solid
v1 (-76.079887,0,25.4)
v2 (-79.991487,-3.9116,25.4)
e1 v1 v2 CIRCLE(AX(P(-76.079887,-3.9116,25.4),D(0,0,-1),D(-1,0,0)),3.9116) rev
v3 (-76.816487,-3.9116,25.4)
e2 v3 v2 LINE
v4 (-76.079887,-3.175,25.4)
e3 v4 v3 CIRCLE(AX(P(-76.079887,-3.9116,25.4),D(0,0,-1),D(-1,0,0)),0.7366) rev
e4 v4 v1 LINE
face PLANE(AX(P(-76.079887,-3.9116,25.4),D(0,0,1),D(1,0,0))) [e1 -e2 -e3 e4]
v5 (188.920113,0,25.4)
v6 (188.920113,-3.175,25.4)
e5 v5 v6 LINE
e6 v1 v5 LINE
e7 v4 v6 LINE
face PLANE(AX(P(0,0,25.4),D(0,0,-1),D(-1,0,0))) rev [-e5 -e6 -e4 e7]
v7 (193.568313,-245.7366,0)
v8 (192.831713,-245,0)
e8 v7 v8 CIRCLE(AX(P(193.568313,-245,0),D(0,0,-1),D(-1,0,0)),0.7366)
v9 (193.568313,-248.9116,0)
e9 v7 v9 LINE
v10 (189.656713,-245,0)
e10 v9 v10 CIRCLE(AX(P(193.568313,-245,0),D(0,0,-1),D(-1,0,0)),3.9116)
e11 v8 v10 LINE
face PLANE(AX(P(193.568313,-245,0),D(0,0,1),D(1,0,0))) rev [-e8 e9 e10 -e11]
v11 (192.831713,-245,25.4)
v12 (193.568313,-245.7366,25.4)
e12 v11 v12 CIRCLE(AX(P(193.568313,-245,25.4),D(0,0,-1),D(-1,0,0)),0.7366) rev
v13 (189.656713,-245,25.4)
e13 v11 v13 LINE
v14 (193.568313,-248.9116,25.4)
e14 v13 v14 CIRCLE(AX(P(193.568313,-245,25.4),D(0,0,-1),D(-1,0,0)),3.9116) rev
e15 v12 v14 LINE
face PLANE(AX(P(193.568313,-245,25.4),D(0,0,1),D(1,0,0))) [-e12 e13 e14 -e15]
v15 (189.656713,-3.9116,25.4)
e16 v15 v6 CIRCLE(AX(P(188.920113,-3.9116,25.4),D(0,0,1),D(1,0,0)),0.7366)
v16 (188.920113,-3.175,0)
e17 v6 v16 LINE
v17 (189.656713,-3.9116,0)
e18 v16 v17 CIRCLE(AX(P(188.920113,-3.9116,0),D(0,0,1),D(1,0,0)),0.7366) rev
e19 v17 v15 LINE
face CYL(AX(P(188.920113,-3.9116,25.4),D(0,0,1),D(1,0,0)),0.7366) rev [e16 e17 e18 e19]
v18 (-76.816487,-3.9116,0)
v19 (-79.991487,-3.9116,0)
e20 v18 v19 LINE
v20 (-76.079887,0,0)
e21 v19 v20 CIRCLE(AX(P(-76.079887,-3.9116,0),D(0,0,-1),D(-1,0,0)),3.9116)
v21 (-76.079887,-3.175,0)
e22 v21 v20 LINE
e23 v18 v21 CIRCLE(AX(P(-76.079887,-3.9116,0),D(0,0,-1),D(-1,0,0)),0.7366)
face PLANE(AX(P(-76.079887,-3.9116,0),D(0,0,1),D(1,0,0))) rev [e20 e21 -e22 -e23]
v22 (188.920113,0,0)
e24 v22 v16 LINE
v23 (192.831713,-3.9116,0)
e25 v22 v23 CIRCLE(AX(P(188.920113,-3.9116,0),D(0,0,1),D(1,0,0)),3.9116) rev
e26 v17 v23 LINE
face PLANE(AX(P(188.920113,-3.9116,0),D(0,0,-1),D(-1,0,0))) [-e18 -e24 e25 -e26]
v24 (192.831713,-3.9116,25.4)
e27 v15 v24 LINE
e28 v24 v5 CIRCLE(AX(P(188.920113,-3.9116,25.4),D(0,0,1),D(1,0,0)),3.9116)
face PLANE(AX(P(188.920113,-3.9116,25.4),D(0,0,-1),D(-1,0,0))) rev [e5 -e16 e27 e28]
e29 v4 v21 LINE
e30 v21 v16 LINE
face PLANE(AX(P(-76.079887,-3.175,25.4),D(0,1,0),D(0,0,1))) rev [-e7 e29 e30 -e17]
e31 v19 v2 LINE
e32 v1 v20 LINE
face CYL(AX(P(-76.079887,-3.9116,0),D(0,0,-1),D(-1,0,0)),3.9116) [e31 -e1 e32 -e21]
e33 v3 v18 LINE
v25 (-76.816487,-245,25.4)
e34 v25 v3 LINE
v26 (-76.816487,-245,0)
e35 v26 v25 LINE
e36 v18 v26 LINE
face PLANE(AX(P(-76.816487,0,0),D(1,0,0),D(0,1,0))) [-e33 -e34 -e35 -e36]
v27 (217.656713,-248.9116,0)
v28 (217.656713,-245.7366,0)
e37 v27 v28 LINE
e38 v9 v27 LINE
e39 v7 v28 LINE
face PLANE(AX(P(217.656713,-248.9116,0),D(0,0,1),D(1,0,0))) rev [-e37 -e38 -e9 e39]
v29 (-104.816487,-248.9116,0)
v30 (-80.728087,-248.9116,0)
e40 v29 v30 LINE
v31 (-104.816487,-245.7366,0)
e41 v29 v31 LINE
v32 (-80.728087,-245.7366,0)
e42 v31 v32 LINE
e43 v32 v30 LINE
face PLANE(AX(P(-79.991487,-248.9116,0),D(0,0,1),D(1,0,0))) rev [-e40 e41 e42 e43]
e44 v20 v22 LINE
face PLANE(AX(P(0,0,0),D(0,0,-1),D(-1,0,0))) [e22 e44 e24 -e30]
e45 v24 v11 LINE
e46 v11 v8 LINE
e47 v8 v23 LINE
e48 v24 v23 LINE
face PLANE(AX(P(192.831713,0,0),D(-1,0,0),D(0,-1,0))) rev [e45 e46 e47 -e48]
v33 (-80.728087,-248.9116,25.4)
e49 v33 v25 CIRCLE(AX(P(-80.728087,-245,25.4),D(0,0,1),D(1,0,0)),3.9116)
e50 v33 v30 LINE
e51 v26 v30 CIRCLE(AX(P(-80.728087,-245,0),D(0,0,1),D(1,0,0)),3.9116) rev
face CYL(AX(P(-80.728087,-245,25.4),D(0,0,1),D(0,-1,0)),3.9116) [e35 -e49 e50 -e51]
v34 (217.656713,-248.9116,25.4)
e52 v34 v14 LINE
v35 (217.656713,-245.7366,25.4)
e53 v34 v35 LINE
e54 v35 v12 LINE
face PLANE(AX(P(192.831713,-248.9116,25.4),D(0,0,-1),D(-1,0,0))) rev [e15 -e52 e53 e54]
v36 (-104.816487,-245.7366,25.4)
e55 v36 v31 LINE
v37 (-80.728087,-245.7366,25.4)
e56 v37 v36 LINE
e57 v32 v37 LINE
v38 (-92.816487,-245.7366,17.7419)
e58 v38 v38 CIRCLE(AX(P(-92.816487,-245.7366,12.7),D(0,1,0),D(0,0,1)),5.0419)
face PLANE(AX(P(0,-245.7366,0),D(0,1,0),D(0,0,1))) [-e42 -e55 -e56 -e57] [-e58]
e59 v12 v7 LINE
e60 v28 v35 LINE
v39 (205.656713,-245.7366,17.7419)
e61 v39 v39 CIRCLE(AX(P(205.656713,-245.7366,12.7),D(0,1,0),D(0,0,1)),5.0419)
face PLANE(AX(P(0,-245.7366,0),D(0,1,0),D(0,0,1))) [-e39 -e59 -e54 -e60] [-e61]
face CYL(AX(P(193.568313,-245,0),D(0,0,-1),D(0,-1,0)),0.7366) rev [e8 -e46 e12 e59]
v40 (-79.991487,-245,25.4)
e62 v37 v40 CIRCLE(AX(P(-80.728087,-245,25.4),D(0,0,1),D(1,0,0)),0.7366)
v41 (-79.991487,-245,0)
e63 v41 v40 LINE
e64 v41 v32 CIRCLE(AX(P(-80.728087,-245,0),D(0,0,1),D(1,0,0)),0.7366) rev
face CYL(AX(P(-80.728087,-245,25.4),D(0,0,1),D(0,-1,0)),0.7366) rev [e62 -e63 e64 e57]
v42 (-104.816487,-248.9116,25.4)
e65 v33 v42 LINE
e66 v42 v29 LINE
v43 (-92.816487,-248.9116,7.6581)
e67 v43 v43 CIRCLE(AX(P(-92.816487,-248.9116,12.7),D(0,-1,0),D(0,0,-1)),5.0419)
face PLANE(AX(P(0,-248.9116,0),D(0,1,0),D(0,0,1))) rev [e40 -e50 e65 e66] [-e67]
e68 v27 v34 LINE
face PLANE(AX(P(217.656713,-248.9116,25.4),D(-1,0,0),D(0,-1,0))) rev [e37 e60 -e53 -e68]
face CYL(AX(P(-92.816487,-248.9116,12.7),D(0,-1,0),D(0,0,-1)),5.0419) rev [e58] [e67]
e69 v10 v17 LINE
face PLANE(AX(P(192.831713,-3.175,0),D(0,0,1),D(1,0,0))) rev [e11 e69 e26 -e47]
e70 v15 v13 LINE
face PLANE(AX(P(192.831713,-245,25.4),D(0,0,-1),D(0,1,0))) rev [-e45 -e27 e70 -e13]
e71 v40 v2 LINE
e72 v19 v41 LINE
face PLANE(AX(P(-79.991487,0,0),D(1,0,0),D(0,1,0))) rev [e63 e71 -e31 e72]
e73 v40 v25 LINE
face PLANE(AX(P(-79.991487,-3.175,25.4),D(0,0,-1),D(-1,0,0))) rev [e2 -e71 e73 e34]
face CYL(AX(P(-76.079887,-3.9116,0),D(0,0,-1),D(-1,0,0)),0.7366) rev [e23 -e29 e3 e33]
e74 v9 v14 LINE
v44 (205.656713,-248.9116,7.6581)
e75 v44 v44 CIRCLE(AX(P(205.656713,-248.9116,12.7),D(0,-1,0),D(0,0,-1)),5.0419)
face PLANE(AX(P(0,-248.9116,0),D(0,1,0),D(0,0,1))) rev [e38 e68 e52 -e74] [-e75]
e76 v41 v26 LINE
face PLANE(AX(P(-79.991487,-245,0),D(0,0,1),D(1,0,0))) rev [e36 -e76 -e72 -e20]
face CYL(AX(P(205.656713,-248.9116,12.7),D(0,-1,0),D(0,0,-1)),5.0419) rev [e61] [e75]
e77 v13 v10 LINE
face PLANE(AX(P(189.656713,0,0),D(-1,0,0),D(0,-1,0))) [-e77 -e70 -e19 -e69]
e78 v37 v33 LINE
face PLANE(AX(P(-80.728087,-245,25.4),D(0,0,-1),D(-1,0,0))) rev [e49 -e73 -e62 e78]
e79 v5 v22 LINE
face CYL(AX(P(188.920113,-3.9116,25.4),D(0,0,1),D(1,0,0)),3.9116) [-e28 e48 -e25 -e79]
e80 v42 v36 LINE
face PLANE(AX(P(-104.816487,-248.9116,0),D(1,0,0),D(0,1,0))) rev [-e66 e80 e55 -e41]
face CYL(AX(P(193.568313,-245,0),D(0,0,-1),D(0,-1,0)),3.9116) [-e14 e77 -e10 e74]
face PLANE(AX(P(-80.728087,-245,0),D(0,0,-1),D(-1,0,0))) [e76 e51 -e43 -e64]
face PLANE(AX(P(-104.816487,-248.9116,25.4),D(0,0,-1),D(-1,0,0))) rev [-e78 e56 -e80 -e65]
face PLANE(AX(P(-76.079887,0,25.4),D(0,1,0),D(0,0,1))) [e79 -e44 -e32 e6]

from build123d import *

# Parameters (mm, degrees)
CROQUIS1_W                    = 265
CROQUIS1_H                    = 3.175
BRIDA_BASE1_DEPTH             = 25.4
BRIDA_DE_ARISTA1_DEPTH        = 25.4
BRIDA_DE_ARISTA1_BEND_DEPTH   = 25.4
BRIDA_DE_ARISTA2_DEPTH        = 25.4
BRIDA_DE_ARISTA2_BEND_DEPTH   = 25.4
TALADRO_DE_MARGEN_PARA_3_81_D = 10.0838


# Sheet-metal steps are written as plain solids
with BuildPart() as part:
    # Croquis1 → Brida base1 (new body)
    with BuildSketch(Plane.XY):
        with Locations((56.420112782, -1.5875)):
            Rectangle(CROQUIS1_W, CROQUIS1_H)
    extrude(amount=BRIDA_BASE1_DEPTH)

    # Brida de arista1 section (across the edge) → Brida de arista1 (add)
    with BuildSketch(Plane(origin=(189.656712782, -3.175, 0), x_dir=(-1, 0, 0), z_dir=(0, 0, 1))):
        with BuildLine():
            Line((-3.175, 0.7366), (-3.175, 241.825))
            Line((-3.175, 241.825), (0, 241.825))
            Line((0, 241.825), (0, 0.7366))
            ThreePointArc((0, 0.7366), (0.215745145, 0.215745145), (0.7366, 0))
            Line((0.7366, 0), (0.7366, -3.175))
            ThreePointArc((0.7366, -3.175), (-2.029318885, -2.029318885), (-3.175, 0.7366))
        make_face()
    extrude(amount=BRIDA_DE_ARISTA1_DEPTH)

    # Brida de arista1 section 2 (across the edge) → Brida de arista1 bend (add)
    with BuildSketch(Plane(origin=(-76.816487218, -3.175, 25.4), x_dir=(1, 0, 0), z_dir=(0, 0, -1))):
        with BuildLine():
            Line((-3.175, 0.7366), (-3.175, 241.825))
            Line((-3.175, 241.825), (0, 241.825))
            Line((0, 241.825), (0, 0.7366))
            ThreePointArc((0, 0.7366), (0.215745145, 0.215745145), (0.7366, 0))
            Line((0.7366, 0), (0.7366, -3.175))
            ThreePointArc((0.7366, -3.175), (-2.029318885, -2.029318885), (-3.175, 0.7366))
        make_face()
    extrude(amount=BRIDA_DE_ARISTA1_BEND_DEPTH)

    # Brida de arista2 section (across the edge) → Brida de arista2 (add)
    with BuildSketch(Plane(origin=(192.831712782, -245.7366, 25.4), x_dir=(0, 1, 0), z_dir=(0, 0, -1))):
        with BuildLine():
            Line((-3.175, 0.7366), (-3.175, 24.825))
            Line((-3.175, 24.825), (0, 24.825))
            Line((0, 24.825), (0, 0.7366))
            ThreePointArc((0, 0.7366), (0.215745145, 0.215745145), (0.7366, 0))
            Line((0.7366, 0), (0.7366, -3.175))
            ThreePointArc((0.7366, -3.175), (-2.029318885, -2.029318885), (-3.175, 0.7366))
        make_face()
    extrude(amount=BRIDA_DE_ARISTA2_DEPTH)

    # Brida de arista2 section 2 (across the edge) → Brida de arista2 bend (add)
    with BuildSketch(Plane(origin=(-79.991487218, -245.7366, 0), x_dir=(0, 1, 0), z_dir=(0, 0, 1))):
        with BuildLine():
            Line((-3.175, 0.7366), (-3.175, 24.825))
            Line((-3.175, 24.825), (0, 24.825))
            Line((0, 24.825), (0, 0.7366))
            ThreePointArc((0, 0.7366), (0.215745145, 0.215745145), (0.7366, 0))
            Line((0.7366, 0), (0.7366, -3.175))
            ThreePointArc((0.7366, -3.175), (-2.029318885, -2.029318885), (-3.175, 0.7366))
        make_face()
    extrude(amount=BRIDA_DE_ARISTA2_BEND_DEPTH)

    # Taladro de margen para 3/81 (through all)
    with Locations(Plane(origin=(0, -248.9116, 0), x_dir=(-1, 0, 0), z_dir=(0, -1, 0))):
        with Locations((92.816487218, -12.7), (-205.656712782, -12.7)):
            Hole(TALADRO_DE_MARGEN_PARA_3_81_D / 2)


solid = part.part
